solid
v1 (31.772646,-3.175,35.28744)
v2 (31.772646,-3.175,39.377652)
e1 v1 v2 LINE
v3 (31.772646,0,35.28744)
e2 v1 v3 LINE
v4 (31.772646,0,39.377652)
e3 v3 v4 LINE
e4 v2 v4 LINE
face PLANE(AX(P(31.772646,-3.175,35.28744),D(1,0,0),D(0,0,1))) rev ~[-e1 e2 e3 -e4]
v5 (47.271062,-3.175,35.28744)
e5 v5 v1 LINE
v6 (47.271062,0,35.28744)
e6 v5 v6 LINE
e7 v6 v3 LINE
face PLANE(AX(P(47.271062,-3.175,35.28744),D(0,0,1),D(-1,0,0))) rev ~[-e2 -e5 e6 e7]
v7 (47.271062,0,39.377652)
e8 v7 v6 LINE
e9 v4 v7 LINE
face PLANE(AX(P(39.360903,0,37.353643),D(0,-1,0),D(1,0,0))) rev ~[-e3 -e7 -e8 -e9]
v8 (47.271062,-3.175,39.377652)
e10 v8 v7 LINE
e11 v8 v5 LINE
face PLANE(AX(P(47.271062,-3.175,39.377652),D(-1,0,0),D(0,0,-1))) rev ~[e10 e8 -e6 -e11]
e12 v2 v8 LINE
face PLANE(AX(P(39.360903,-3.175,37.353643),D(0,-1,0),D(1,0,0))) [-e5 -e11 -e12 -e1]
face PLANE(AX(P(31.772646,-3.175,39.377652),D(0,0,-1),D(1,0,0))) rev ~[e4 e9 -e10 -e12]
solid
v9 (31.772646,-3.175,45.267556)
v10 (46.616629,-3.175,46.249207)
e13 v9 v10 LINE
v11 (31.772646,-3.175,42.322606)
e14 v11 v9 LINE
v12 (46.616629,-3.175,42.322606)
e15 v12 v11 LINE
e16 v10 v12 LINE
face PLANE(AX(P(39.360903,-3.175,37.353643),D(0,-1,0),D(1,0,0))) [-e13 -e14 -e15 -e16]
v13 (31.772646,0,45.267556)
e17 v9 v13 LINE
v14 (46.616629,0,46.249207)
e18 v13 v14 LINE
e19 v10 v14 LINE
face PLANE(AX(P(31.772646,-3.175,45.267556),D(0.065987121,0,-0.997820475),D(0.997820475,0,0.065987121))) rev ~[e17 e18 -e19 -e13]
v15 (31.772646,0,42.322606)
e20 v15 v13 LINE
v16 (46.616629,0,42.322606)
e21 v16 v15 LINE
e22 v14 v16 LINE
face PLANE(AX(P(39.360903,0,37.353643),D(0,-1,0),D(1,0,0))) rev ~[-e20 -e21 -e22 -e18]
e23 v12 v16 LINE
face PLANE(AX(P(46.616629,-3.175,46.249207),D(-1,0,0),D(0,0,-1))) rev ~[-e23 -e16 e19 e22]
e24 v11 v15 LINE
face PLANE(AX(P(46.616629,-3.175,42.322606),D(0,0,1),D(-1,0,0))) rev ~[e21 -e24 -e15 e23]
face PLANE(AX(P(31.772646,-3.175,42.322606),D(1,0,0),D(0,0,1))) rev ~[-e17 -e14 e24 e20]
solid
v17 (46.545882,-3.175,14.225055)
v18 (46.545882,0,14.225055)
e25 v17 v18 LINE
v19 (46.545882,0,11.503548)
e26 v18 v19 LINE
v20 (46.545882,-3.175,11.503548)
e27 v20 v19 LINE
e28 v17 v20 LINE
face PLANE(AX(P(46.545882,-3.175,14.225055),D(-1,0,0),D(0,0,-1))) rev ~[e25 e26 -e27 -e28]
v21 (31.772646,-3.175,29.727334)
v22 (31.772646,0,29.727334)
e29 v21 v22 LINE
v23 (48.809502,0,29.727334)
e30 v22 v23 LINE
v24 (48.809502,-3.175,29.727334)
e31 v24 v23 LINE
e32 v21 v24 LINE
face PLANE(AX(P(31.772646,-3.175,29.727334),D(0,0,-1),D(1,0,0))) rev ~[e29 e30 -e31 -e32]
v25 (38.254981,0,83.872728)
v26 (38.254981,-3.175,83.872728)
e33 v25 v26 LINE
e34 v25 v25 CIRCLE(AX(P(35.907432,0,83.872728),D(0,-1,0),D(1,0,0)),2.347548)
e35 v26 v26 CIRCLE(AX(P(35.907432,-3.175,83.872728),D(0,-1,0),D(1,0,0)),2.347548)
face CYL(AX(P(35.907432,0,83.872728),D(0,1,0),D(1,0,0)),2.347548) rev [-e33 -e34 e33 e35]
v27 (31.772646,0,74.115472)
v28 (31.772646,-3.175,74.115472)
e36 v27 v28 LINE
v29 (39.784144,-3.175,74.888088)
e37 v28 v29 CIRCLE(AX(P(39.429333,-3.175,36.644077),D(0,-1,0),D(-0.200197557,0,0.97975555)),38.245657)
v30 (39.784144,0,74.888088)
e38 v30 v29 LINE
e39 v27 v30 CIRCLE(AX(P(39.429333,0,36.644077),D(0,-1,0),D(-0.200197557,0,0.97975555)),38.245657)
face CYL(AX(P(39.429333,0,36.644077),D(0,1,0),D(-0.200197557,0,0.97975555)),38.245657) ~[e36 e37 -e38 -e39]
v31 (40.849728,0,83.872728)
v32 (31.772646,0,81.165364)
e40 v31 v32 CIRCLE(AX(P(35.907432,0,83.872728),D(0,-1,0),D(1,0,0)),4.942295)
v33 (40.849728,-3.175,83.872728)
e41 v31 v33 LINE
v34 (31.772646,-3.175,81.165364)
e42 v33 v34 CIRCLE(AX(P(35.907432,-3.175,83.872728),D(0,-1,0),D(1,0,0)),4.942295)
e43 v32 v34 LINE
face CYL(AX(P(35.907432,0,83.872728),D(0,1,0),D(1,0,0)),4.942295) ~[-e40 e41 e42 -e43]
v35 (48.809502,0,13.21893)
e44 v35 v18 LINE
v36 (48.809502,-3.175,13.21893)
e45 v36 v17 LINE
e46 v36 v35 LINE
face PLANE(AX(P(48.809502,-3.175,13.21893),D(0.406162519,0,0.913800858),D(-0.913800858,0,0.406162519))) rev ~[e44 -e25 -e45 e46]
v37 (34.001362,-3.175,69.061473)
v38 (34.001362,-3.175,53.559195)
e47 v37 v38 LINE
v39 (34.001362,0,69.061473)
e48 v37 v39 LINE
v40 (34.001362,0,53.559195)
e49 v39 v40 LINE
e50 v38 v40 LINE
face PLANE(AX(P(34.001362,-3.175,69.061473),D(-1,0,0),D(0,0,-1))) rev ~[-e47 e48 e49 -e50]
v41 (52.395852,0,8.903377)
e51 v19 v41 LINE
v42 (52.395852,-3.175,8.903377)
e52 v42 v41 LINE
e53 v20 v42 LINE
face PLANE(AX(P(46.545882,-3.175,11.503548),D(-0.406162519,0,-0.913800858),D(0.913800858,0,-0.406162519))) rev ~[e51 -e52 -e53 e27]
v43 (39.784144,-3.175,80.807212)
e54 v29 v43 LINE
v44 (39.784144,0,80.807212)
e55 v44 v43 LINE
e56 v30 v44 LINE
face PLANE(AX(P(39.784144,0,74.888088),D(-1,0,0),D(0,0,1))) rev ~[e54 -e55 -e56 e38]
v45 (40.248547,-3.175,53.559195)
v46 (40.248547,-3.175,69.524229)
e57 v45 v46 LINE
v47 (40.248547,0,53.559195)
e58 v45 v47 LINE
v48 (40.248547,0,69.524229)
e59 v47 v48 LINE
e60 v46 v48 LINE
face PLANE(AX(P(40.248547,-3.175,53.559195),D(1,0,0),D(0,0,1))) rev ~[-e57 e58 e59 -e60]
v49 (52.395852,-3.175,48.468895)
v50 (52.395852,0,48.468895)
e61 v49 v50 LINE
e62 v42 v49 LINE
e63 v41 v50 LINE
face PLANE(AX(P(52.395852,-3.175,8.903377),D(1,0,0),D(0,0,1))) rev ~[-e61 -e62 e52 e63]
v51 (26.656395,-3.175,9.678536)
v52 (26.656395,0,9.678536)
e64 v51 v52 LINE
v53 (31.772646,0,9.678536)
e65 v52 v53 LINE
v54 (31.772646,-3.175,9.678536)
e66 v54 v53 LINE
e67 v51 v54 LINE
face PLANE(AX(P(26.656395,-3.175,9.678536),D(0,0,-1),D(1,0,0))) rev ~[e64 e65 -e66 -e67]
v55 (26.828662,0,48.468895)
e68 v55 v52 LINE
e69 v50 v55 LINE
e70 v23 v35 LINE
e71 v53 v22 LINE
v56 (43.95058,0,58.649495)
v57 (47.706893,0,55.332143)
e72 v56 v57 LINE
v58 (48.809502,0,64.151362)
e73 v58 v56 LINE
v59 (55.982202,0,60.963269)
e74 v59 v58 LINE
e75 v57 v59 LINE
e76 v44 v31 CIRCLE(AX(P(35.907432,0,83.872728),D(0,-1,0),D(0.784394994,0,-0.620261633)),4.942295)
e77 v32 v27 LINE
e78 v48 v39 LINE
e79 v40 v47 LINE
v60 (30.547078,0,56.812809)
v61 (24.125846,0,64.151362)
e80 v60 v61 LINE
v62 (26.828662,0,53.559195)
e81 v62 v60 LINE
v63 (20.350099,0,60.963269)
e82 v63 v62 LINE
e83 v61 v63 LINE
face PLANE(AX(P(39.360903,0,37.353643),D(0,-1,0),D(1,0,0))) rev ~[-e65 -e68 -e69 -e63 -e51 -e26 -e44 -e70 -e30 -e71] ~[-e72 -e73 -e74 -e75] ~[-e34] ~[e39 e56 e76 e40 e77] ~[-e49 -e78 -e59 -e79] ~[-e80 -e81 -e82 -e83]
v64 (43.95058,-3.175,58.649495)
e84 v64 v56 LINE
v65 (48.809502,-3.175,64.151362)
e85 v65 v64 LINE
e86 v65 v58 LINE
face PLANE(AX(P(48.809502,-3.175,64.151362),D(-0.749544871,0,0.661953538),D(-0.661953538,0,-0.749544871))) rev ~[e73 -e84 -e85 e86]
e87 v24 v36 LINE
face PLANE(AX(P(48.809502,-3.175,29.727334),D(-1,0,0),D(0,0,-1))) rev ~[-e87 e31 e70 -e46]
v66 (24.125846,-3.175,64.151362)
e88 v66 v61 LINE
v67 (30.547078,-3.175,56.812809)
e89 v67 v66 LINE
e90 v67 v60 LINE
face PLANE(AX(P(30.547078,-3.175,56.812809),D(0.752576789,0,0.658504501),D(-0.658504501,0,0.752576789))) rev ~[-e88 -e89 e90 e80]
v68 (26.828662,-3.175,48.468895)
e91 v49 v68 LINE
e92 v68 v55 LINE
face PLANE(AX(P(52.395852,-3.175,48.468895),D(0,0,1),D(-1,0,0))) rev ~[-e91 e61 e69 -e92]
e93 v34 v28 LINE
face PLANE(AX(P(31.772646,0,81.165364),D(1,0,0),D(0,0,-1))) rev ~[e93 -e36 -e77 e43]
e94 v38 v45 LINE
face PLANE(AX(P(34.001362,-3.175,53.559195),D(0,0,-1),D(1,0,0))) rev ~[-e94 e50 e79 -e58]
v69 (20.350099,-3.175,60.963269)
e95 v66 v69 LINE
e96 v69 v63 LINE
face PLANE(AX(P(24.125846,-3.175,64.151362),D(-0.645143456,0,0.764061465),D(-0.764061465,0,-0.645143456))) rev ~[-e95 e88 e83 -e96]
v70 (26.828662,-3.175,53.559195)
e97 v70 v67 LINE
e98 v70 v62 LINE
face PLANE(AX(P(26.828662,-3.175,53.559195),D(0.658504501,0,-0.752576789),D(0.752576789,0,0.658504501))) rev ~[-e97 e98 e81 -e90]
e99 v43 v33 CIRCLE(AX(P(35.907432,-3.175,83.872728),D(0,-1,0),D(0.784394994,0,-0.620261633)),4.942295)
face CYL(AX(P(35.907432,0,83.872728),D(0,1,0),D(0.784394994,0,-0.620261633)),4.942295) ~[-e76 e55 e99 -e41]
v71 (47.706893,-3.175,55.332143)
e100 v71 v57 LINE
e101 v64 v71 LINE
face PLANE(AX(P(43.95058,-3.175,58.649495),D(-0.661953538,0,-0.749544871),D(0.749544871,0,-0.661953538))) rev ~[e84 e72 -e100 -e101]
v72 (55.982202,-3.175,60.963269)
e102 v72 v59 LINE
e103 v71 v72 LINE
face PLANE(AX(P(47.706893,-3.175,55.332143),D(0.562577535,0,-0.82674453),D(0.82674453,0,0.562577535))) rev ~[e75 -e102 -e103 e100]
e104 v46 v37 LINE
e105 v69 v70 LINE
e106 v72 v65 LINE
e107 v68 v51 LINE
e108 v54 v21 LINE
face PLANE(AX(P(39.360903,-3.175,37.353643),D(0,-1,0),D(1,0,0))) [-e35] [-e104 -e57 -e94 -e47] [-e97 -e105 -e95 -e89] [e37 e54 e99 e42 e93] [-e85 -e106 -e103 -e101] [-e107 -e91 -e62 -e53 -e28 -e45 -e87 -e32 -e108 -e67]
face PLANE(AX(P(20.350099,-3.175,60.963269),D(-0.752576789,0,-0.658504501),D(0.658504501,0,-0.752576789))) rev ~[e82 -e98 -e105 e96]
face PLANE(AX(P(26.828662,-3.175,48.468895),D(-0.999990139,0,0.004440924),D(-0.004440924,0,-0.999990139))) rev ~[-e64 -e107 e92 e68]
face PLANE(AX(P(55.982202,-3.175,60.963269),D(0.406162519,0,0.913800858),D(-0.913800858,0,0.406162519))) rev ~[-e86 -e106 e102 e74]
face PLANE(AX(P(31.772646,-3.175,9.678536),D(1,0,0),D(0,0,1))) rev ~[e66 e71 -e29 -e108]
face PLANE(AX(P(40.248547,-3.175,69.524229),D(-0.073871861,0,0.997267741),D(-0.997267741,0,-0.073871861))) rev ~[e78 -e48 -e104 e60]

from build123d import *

# Parameters (mm, degrees)
F0_R     = 2.3475480715
F1_DEPTH = 3.175
F3_DEPTH = 3.175


# Not quite as in the source:
# - a feature names something its author has since deleted; it is built from what else it names


with BuildPart() as f1:
    # F0 (on Front) → F1 (new body)
    with BuildSketch(Plane.XZ):
        with BuildLine():
            ThreePointArc((31.7726456889, 74.1154716994), (15.2436424275, 7.0166806556), (77.6749893029, 36.6440773635))
            ThreePointArc((77.6749893029, 36.6440773635), (66.5982509819, 63.5621034518), (39.7841440278, 74.8880881142))
            ThreePointArc((39.7841440278, 74.8880881142), (35.7580139785, 74.7131155477), (31.7726456889, 74.1154716994))
        make_face()
        with BuildLine():
            ThreePointArc((31.7726456889, 74.1154716994), (35.7580139785, 74.7131155477), (39.7841440278, 74.8880881142))
            Line((39.7841440278, 74.8880881142), (39.7841440278, 80.807211974))
            ThreePointArc((39.7841440278, 80.807211974), (35.6867088214, 78.9353641119), (31.7726456889, 81.1653639963))
            Line((31.7726456889, 81.1653639963), (31.7726456889, 74.1154716994))
        make_face()
        with BuildLine():
            ThreePointArc((31.7726456889, 81.1653639963), (35.6867088214, 78.9353641119), (39.7841440278, 80.807211974))
            ThreePointArc((39.7841440278, 80.807211974), (40.5757369766, 82.2500098688), (40.8497276092, 83.8727280498))
            ThreePointArc((40.8497276092, 83.8727280498), (34.4948204969, 88.6088455606), (31.7726456889, 81.1653639963))
        make_face()
        with Locations((35.9074324369, 83.8727280498)):
            Circle(F0_R, mode=Mode.SUBTRACT)
    extrude(amount=F1_DEPTH)

    # F2 (on face) → F3 (cut)
    with BuildSketch(Plane.XZ.offset(3.175)):
        Polygon((24.1258461707, 64.1513620911), (20.3500986099, 60.9632693231), (26.828661561, 53.5591952503), (30.5470783074, 56.8128089679), align=None)
        Polygon((40.2485467494, 69.5242285728), (34.0013615787, 69.061473012), (34.0013615787, 53.5591952503), (40.2485467494, 53.5591952503), align=None)
        Polygon((55.9822022915, 60.9632693231), (48.8095022738, 64.1513620911), (43.9505800605, 58.649495244), (47.7068929317, 55.3321426876), align=None)
        Polygon((52.3958522826, 48.4688952565), (26.828661561, 48.4688952565), (26.6563948244, 9.6785360947), (31.7726456889, 9.6785360947), (31.7726456889, 29.7273341566), (48.8095022738, 29.7273341566), (48.8095022738, 13.2189297204), (46.5458819901, 14.2250545323), (46.5458819901, 11.503547954), (52.3958522826, 8.9033767581), align=None)
        Polygon((34.3574807048, 35.2874398232), (31.7726456889, 35.2874398232), (31.7726456889, 39.3776521087), (47.2710616887, 39.3776521087), (47.2710616887, 35.2874398232), (36.1486673355, 35.2874398232), align=None, mode=Mode.SUBTRACT)
        Polygon((31.7726456889, 42.3226058483), (31.7726456889, 45.2675558627), (46.6166287661, 46.2492071092), (46.6166287661, 42.3226058483), align=None, mode=Mode.SUBTRACT)
    extrude(amount=-F3_DEPTH, mode=Mode.SUBTRACT)


solid = f1.part
